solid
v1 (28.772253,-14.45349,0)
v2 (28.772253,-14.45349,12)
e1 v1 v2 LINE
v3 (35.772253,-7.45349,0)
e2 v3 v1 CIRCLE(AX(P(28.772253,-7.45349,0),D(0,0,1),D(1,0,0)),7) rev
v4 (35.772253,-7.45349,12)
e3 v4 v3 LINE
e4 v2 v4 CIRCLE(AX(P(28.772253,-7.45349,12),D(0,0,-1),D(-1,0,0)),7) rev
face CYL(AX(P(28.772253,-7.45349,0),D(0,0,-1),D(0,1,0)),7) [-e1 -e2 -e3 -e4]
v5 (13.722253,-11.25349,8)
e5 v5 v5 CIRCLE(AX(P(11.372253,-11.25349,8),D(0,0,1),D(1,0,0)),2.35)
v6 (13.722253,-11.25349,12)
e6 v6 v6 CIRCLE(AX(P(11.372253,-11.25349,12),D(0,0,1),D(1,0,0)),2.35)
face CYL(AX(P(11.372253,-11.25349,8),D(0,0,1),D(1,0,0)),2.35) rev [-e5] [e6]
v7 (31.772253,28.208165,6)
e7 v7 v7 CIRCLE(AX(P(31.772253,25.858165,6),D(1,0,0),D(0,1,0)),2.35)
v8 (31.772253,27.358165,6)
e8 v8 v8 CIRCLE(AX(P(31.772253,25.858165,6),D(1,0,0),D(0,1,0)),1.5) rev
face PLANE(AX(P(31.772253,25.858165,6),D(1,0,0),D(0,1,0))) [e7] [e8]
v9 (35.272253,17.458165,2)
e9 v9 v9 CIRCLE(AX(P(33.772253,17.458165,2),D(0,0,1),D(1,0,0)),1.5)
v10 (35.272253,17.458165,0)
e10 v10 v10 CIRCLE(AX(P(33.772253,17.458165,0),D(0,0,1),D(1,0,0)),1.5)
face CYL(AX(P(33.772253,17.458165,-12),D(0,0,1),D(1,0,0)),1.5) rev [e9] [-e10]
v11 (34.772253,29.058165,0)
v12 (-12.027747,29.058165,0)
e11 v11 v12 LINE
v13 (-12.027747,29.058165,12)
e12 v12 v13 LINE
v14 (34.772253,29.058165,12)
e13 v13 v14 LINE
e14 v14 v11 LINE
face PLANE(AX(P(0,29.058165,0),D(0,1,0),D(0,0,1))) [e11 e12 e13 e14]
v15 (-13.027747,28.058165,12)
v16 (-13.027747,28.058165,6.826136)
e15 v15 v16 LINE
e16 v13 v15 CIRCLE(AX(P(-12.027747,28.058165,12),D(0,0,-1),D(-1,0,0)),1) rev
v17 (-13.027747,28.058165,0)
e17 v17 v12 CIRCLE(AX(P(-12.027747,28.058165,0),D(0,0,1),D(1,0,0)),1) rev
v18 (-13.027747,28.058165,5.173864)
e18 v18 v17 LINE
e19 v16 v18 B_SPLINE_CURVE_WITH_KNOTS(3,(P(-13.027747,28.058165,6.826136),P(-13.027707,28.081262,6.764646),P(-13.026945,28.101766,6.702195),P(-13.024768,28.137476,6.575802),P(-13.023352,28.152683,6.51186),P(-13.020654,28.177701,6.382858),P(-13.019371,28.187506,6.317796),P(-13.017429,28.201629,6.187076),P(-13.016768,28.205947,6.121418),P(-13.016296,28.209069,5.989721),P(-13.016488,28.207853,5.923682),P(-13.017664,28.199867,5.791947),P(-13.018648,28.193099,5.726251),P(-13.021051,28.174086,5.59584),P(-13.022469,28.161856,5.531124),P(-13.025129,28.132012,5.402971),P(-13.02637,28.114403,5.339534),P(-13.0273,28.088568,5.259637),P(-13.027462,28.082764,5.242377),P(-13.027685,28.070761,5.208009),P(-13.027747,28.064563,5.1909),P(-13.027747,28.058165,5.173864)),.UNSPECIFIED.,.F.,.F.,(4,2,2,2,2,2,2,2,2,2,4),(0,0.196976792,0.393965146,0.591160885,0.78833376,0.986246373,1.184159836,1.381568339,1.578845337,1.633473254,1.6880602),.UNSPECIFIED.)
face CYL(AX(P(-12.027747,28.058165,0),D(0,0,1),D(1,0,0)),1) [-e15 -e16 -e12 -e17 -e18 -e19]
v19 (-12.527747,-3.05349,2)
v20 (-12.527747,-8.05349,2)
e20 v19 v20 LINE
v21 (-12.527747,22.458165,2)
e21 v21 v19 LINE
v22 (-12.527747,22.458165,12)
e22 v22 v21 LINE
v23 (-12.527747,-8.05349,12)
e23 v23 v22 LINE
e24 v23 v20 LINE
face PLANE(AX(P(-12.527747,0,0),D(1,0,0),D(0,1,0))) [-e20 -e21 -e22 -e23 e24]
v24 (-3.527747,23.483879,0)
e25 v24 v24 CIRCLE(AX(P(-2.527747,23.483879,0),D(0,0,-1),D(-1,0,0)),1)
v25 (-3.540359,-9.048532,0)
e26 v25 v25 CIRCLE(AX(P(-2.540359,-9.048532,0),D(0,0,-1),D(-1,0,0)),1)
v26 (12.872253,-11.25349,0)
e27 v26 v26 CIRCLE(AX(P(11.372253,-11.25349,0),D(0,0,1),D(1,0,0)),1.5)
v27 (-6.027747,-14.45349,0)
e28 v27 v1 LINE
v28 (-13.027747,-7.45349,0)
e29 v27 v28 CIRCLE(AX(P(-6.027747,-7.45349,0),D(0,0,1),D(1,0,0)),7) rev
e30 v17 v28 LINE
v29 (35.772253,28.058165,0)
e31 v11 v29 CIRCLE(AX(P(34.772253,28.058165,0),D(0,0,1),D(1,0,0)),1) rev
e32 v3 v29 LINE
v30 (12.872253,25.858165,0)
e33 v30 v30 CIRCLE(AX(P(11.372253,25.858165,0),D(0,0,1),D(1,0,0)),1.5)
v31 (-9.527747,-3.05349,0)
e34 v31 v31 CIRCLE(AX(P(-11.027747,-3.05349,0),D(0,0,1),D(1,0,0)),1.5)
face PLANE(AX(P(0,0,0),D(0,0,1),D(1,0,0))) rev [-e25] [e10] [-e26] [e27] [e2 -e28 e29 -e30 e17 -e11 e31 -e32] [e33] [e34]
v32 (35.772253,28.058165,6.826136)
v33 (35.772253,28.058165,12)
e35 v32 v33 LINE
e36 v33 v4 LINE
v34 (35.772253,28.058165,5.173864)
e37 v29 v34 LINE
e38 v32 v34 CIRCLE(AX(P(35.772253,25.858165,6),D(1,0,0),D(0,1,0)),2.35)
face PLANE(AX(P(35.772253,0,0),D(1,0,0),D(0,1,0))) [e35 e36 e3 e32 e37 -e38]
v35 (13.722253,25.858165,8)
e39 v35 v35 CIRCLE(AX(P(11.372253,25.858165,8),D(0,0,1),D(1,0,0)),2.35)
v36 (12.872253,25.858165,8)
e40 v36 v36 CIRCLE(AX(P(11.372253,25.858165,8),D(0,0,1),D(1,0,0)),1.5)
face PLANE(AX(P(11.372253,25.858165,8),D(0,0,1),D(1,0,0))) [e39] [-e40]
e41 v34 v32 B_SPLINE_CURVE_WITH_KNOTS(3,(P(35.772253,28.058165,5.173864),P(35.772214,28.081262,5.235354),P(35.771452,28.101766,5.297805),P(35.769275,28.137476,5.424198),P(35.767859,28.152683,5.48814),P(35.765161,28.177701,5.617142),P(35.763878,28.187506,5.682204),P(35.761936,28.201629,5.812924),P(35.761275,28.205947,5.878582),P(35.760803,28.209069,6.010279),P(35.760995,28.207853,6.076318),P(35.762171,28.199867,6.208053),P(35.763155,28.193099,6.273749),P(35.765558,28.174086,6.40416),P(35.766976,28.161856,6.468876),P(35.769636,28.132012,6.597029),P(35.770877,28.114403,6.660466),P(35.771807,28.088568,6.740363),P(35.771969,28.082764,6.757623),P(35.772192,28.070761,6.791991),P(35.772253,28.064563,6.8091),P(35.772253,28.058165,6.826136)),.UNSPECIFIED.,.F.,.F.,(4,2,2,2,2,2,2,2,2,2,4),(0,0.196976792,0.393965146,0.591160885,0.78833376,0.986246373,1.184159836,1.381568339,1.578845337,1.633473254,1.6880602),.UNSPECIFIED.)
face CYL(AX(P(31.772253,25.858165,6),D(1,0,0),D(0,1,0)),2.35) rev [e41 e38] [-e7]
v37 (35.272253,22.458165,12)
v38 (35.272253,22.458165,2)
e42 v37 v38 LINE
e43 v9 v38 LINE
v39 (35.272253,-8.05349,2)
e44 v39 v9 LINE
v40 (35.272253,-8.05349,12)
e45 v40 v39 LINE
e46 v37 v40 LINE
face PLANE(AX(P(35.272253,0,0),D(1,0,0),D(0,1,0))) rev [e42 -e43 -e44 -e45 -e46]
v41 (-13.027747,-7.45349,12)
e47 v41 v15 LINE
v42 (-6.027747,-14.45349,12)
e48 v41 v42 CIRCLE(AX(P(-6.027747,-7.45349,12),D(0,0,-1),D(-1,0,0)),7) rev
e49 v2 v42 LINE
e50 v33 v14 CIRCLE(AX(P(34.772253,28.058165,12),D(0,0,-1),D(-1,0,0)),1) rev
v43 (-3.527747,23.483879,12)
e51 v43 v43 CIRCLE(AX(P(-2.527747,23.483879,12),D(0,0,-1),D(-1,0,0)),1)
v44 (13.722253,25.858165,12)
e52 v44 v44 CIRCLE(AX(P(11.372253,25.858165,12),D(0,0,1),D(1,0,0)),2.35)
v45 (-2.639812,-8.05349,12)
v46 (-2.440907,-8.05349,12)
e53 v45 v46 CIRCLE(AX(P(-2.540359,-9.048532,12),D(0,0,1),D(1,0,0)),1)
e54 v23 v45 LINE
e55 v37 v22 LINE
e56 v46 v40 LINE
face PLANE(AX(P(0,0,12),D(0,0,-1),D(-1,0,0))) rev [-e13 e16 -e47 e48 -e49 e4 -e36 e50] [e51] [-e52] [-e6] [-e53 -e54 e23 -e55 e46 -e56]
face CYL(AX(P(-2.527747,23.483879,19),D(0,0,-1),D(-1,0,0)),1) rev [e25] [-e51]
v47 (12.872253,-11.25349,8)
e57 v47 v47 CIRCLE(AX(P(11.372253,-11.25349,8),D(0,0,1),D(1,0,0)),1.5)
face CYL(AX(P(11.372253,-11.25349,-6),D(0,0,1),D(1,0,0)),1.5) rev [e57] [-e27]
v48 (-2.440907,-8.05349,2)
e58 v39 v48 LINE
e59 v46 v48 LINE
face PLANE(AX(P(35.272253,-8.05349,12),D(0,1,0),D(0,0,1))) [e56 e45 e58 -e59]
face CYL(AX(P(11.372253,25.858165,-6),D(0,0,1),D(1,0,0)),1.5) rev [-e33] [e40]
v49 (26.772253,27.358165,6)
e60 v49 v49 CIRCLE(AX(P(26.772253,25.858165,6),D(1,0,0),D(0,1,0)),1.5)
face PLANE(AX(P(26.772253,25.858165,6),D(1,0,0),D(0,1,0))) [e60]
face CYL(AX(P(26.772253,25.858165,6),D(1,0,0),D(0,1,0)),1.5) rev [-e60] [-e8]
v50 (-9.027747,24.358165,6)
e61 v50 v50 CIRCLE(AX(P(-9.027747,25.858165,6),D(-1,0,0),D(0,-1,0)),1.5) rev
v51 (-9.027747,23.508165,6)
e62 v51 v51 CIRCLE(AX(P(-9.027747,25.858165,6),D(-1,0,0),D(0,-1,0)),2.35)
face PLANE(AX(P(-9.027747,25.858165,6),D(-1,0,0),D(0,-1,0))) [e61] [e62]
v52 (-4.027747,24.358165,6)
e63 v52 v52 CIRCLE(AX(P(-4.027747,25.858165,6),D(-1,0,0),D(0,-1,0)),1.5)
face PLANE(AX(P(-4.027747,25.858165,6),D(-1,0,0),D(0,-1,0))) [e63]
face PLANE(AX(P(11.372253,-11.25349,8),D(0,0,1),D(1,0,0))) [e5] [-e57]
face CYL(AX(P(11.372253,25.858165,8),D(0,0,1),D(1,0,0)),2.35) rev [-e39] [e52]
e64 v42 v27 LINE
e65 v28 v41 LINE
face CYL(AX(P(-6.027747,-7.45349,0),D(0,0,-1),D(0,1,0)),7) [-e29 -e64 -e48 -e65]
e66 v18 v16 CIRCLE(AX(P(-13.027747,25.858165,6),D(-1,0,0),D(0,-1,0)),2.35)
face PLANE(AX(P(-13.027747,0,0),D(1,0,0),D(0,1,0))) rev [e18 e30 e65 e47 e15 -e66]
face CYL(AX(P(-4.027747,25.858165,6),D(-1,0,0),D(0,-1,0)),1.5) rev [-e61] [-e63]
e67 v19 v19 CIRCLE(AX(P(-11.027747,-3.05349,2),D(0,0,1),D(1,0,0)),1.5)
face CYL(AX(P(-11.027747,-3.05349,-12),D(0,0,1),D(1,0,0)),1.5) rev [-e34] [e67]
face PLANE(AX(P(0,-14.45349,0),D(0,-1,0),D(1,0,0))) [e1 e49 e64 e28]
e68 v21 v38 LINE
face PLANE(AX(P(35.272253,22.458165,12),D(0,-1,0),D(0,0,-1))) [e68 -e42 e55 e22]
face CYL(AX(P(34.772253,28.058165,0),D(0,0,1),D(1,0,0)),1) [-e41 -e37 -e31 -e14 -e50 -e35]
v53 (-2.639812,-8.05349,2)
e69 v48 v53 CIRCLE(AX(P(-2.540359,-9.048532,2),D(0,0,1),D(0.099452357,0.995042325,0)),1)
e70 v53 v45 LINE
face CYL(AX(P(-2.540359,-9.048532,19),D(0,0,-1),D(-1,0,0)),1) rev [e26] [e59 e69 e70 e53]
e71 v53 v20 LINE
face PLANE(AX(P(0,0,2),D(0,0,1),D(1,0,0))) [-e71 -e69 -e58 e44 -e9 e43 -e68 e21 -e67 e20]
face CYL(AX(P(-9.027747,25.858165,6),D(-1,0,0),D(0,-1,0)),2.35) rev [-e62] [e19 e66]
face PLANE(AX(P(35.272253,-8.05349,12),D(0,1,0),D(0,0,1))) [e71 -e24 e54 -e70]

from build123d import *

# Parameters (mm, degrees)
SKIZZE4_W                       = 47.8
SKIZZE4_H                       = 37.511655438
AUFSATZ_LINEAR_AUSTRAGEN2_DEPTH = 2
SKIZZE5_W                       = 47.8
SKIZZE5_H                       = 3.6
SKIZZE5_H_2                     = 3.4
AUFSATZ_LINEAR_AUSTRAGEN3_DEPTH = 12
SKIZZE6_R                       = 1
SCHNITT_LINEAR_AUSTRAGEN1_DEPTH = 19
SKIZZE8_W                       = 47.8
SKIZZE8_H                       = 12
AUFSATZ_LINEAR_AUSTRAGEN4_DEPTH = 3
SKIZZE9_W                       = 47.8
SKIZZE9_H                       = 12
AUFSATZ_LINEAR_AUSTRAGEN5_DEPTH = 3
SKIZZE10_W                      = 12
SKIZZE10_H                      = 43.511655438
AUFSATZ_LINEAR_AUSTRAGEN6_DEPTH = 0.5
SKIZZE11_W                      = 12
SKIZZE11_H                      = 43.511655438
AUFSATZ_LINEAR_AUSTRAGEN7_DEPTH = 0.5
SKIZZE12_R                      = 1.5
SCHNITT_LINEAR_AUSTRAGEN2_DEPTH = 9
SCHNITT_LINEAR_START            = -9
SKIZZE13_R                      = 1.5
SCHNITT_LINEAR_AUSTRAGEN3_DEPTH = 9
SKIZZE14_R                      = 2.35
SCHNITT_LINEAR_AUSTRAGEN4_DEPTH = 4
SCHNITT_LINEAR_START_2          = -4
SKIZZE15_R                      = 2.35
SCHNITT_LINEAR_AUSTRAGEN5_DEPTH = 4
VERRUNDUNG3_R                   = 1
VERRUNDUNG4_R                   = 1
VERRUNDUNG5_R                   = 7
SKIZZE17_R                      = 2.35
SCHNITT_LINEAR_AUSTRAGEN6_DEPTH = 4
SKIZZE18_R                      = 1.5
SCHNITT_LINEAR_AUSTRAGEN7_DEPTH = 14
SKIZZE19_R                      = 1.5
SCHNITT_LINEAR_AUSTRAGEN8_DEPTH = 14


with BuildPart() as part:
    # Skizze4 → Aufsatz-Linear austragen2 (new body)
    with BuildSketch(Plane.XY):
        with Locations((11.372253432, 7.302337754)):
            Rectangle(SKIZZE4_W, SKIZZE4_H)
    extrude(amount=AUFSATZ_LINEAR_AUSTRAGEN2_DEPTH)

    # Skizze5 → Aufsatz-Linear austragen3 (add)
    with BuildSketch(Plane(origin=(0, 0, 0), x_dir=(-1, 0, 0), z_dir=(0, 0, -1))):
        with Locations((-11.372253432, 24.258165473)):
            Rectangle(SKIZZE5_W, SKIZZE5_H)
        with Locations((-11.372253432, -9.753489965)):
            Rectangle(SKIZZE5_W, SKIZZE5_H_2)
    extrude(amount=-AUFSATZ_LINEAR_AUSTRAGEN3_DEPTH)

    # Skizze6 → Schnitt-Linear austragen1 (cut)
    with BuildSketch(Plane(origin=(0, 0, 0), x_dir=(-1, 0, 0), z_dir=(0, 0, -1))):
        with Locations((2.527746568, 23.483879087)):
            Circle(SKIZZE6_R)
        with Locations((2.540359159, -9.04853229)):
            Circle(SKIZZE6_R)
    extrude(amount=-SCHNITT_LINEAR_AUSTRAGEN1_DEPTH, mode=Mode.SUBTRACT)

    # Skizze8 → Aufsatz-Linear austragen4 (add)
    with BuildSketch(Plane(origin=(0, 26.058165473, 0), x_dir=(1, 0, 0), z_dir=(0, 1, 0))):
        with Locations((11.372253432, -6)):
            Rectangle(SKIZZE8_W, SKIZZE8_H)
    extrude(amount=AUFSATZ_LINEAR_AUSTRAGEN4_DEPTH)

    # Skizze9 → Aufsatz-Linear austragen5 (add)
    with BuildSketch(Plane.XZ.offset(11.453489965)):
        with Locations((11.372253432, 6)):
            Rectangle(SKIZZE9_W, SKIZZE9_H)
    extrude(amount=AUFSATZ_LINEAR_AUSTRAGEN5_DEPTH)

    # Skizze10 → Aufsatz-Linear austragen6 (add)
    with BuildSketch(Plane.ZY.offset(12.527746568)):
        with Locations((6, 7.302337754)):
            Rectangle(SKIZZE10_W, SKIZZE10_H)
    extrude(amount=AUFSATZ_LINEAR_AUSTRAGEN6_DEPTH)

    # Skizze11 → Aufsatz-Linear austragen7 (add)
    with BuildSketch(Plane(origin=(35.272253432, 0, 0), x_dir=(0, 0, -1), z_dir=(1, 0, 0))):
        with Locations((-6, 7.302337754)):
            Rectangle(SKIZZE11_W, SKIZZE11_H)
    extrude(amount=AUFSATZ_LINEAR_AUSTRAGEN7_DEPTH)

    # Skizze12 → Schnitt-Linear austragen2 (cut)
    with BuildSketch(Plane.ZY.offset(13.027746568)):
        with Locations(Location((6, 25.858165473, 0), (0, 0, 270))):
            Circle(SKIZZE12_R)
    extrude(amount=-SCHNITT_LINEAR_AUSTRAGEN2_DEPTH, mode=Mode.SUBTRACT)

    # Skizze13 → Schnitt-Linear austragen3 (cut)
    with BuildSketch(Plane(origin=(35.772253432, 0, 0), x_dir=(0, 0, -1), z_dir=(1, 0, 0)).offset(SCHNITT_LINEAR_START)):
        with Locations(Location((-6, 25.858165473, 0), (0, 0, 270))):
            Circle(SKIZZE13_R)
    extrude(amount=SCHNITT_LINEAR_AUSTRAGEN3_DEPTH, mode=Mode.SUBTRACT)

    # Skizze14 → Schnitt-Linear austragen4 (cut)
    with BuildSketch(Plane.ZY.offset(13.027746568)):
        with Locations(Location((6, 25.858165473, 0), (0, 0, 270))):
            Circle(SKIZZE14_R)
    extrude(amount=-SCHNITT_LINEAR_AUSTRAGEN4_DEPTH, mode=Mode.SUBTRACT)

    # Skizze15 → Schnitt-Linear austragen5 (cut)
    with BuildSketch(Plane(origin=(35.772253432, 0, 0), x_dir=(0, 0, -1), z_dir=(1, 0, 0)).offset(SCHNITT_LINEAR_START_2)):
        with Locations(Location((-6, 25.858165473, 0), (0, 0, 270))):
            Circle(SKIZZE15_R)
    extrude(amount=SCHNITT_LINEAR_AUSTRAGEN5_DEPTH, mode=Mode.SUBTRACT)

    # Verrundung3
    # the kernel refuses this fillet: 1 mm, written as the material it takes off along each edge
    with BuildSketch(Plane(origin=(35.772253432, 29.058165473, 14.5), x_dir=(-1, 0, 0), z_dir=(0, 0, -1))) as verrundung3_piece_1:
        with BuildLine():
            CenterArc((VERRUNDUNG3_R, -VERRUNDUNG3_R), VERRUNDUNG3_R, 90, 90)
            Line((0, -VERRUNDUNG3_R), (0, 0))
            Line((0, 0), (VERRUNDUNG3_R, 0))
        make_face()
    extrude(amount=17, mode=Mode.SUBTRACT)

    # Verrundung4
    # the kernel refuses this fillet: 1 mm, written as the material it takes off along each edge
    with BuildSketch(Plane(origin=(-13.027746568, 29.058165473, 14.5), x_dir=(1, 0, 0), z_dir=(0, 0, -1))) as verrundung4_piece_1:
        with BuildLine():
            CenterArc((VERRUNDUNG4_R, VERRUNDUNG4_R), VERRUNDUNG4_R, 180, 90)
            Line((0, VERRUNDUNG4_R), (0, 0))
            Line((0, 0), (VERRUNDUNG4_R, 0))
        make_face()
    extrude(amount=17, mode=Mode.SUBTRACT)

    # Verrundung5
    verrundung5_edges = [part.edges().sort_by_distance(p)[0] for p in [
        (35.772253432, -14.453489965, 6),
        (-13.027746568, -14.453489965, 6),
    ]]
    fillet(verrundung5_edges, radius=VERRUNDUNG5_R)

    # Skizze17 → Schnitt-Linear austragen6 (cut)
    with BuildSketch(Plane.XY.offset(12)):
        with Locations((11.372253432, -11.253489965)):
            Circle(SKIZZE17_R)
        with Locations((11.372253432, 25.858165473)):
            Circle(SKIZZE17_R)
    extrude(amount=-SCHNITT_LINEAR_AUSTRAGEN6_DEPTH, mode=Mode.SUBTRACT)

    # Skizze18 → Schnitt-Linear austragen7 (cut)
    with BuildSketch(Plane.XY.offset(8)):
        with Locations((11.372253432, -11.253489965)):
            Circle(SKIZZE18_R)
        with Locations((11.372253432, 25.858165473)):
            Circle(SKIZZE18_R)
    extrude(amount=-SCHNITT_LINEAR_AUSTRAGEN7_DEPTH, mode=Mode.SUBTRACT)

    # Skizze19 → Schnitt-Linear austragen8 (cut)
    with BuildSketch(Plane.XY.offset(2)):
        with Locations((-11.027746568, -3.053489965)):
            Circle(SKIZZE19_R)
        with Locations((33.772253432, 17.458165473)):
            Circle(SKIZZE19_R)
    extrude(amount=-SCHNITT_LINEAR_AUSTRAGEN8_DEPTH, mode=Mode.SUBTRACT)


solid = part.part
